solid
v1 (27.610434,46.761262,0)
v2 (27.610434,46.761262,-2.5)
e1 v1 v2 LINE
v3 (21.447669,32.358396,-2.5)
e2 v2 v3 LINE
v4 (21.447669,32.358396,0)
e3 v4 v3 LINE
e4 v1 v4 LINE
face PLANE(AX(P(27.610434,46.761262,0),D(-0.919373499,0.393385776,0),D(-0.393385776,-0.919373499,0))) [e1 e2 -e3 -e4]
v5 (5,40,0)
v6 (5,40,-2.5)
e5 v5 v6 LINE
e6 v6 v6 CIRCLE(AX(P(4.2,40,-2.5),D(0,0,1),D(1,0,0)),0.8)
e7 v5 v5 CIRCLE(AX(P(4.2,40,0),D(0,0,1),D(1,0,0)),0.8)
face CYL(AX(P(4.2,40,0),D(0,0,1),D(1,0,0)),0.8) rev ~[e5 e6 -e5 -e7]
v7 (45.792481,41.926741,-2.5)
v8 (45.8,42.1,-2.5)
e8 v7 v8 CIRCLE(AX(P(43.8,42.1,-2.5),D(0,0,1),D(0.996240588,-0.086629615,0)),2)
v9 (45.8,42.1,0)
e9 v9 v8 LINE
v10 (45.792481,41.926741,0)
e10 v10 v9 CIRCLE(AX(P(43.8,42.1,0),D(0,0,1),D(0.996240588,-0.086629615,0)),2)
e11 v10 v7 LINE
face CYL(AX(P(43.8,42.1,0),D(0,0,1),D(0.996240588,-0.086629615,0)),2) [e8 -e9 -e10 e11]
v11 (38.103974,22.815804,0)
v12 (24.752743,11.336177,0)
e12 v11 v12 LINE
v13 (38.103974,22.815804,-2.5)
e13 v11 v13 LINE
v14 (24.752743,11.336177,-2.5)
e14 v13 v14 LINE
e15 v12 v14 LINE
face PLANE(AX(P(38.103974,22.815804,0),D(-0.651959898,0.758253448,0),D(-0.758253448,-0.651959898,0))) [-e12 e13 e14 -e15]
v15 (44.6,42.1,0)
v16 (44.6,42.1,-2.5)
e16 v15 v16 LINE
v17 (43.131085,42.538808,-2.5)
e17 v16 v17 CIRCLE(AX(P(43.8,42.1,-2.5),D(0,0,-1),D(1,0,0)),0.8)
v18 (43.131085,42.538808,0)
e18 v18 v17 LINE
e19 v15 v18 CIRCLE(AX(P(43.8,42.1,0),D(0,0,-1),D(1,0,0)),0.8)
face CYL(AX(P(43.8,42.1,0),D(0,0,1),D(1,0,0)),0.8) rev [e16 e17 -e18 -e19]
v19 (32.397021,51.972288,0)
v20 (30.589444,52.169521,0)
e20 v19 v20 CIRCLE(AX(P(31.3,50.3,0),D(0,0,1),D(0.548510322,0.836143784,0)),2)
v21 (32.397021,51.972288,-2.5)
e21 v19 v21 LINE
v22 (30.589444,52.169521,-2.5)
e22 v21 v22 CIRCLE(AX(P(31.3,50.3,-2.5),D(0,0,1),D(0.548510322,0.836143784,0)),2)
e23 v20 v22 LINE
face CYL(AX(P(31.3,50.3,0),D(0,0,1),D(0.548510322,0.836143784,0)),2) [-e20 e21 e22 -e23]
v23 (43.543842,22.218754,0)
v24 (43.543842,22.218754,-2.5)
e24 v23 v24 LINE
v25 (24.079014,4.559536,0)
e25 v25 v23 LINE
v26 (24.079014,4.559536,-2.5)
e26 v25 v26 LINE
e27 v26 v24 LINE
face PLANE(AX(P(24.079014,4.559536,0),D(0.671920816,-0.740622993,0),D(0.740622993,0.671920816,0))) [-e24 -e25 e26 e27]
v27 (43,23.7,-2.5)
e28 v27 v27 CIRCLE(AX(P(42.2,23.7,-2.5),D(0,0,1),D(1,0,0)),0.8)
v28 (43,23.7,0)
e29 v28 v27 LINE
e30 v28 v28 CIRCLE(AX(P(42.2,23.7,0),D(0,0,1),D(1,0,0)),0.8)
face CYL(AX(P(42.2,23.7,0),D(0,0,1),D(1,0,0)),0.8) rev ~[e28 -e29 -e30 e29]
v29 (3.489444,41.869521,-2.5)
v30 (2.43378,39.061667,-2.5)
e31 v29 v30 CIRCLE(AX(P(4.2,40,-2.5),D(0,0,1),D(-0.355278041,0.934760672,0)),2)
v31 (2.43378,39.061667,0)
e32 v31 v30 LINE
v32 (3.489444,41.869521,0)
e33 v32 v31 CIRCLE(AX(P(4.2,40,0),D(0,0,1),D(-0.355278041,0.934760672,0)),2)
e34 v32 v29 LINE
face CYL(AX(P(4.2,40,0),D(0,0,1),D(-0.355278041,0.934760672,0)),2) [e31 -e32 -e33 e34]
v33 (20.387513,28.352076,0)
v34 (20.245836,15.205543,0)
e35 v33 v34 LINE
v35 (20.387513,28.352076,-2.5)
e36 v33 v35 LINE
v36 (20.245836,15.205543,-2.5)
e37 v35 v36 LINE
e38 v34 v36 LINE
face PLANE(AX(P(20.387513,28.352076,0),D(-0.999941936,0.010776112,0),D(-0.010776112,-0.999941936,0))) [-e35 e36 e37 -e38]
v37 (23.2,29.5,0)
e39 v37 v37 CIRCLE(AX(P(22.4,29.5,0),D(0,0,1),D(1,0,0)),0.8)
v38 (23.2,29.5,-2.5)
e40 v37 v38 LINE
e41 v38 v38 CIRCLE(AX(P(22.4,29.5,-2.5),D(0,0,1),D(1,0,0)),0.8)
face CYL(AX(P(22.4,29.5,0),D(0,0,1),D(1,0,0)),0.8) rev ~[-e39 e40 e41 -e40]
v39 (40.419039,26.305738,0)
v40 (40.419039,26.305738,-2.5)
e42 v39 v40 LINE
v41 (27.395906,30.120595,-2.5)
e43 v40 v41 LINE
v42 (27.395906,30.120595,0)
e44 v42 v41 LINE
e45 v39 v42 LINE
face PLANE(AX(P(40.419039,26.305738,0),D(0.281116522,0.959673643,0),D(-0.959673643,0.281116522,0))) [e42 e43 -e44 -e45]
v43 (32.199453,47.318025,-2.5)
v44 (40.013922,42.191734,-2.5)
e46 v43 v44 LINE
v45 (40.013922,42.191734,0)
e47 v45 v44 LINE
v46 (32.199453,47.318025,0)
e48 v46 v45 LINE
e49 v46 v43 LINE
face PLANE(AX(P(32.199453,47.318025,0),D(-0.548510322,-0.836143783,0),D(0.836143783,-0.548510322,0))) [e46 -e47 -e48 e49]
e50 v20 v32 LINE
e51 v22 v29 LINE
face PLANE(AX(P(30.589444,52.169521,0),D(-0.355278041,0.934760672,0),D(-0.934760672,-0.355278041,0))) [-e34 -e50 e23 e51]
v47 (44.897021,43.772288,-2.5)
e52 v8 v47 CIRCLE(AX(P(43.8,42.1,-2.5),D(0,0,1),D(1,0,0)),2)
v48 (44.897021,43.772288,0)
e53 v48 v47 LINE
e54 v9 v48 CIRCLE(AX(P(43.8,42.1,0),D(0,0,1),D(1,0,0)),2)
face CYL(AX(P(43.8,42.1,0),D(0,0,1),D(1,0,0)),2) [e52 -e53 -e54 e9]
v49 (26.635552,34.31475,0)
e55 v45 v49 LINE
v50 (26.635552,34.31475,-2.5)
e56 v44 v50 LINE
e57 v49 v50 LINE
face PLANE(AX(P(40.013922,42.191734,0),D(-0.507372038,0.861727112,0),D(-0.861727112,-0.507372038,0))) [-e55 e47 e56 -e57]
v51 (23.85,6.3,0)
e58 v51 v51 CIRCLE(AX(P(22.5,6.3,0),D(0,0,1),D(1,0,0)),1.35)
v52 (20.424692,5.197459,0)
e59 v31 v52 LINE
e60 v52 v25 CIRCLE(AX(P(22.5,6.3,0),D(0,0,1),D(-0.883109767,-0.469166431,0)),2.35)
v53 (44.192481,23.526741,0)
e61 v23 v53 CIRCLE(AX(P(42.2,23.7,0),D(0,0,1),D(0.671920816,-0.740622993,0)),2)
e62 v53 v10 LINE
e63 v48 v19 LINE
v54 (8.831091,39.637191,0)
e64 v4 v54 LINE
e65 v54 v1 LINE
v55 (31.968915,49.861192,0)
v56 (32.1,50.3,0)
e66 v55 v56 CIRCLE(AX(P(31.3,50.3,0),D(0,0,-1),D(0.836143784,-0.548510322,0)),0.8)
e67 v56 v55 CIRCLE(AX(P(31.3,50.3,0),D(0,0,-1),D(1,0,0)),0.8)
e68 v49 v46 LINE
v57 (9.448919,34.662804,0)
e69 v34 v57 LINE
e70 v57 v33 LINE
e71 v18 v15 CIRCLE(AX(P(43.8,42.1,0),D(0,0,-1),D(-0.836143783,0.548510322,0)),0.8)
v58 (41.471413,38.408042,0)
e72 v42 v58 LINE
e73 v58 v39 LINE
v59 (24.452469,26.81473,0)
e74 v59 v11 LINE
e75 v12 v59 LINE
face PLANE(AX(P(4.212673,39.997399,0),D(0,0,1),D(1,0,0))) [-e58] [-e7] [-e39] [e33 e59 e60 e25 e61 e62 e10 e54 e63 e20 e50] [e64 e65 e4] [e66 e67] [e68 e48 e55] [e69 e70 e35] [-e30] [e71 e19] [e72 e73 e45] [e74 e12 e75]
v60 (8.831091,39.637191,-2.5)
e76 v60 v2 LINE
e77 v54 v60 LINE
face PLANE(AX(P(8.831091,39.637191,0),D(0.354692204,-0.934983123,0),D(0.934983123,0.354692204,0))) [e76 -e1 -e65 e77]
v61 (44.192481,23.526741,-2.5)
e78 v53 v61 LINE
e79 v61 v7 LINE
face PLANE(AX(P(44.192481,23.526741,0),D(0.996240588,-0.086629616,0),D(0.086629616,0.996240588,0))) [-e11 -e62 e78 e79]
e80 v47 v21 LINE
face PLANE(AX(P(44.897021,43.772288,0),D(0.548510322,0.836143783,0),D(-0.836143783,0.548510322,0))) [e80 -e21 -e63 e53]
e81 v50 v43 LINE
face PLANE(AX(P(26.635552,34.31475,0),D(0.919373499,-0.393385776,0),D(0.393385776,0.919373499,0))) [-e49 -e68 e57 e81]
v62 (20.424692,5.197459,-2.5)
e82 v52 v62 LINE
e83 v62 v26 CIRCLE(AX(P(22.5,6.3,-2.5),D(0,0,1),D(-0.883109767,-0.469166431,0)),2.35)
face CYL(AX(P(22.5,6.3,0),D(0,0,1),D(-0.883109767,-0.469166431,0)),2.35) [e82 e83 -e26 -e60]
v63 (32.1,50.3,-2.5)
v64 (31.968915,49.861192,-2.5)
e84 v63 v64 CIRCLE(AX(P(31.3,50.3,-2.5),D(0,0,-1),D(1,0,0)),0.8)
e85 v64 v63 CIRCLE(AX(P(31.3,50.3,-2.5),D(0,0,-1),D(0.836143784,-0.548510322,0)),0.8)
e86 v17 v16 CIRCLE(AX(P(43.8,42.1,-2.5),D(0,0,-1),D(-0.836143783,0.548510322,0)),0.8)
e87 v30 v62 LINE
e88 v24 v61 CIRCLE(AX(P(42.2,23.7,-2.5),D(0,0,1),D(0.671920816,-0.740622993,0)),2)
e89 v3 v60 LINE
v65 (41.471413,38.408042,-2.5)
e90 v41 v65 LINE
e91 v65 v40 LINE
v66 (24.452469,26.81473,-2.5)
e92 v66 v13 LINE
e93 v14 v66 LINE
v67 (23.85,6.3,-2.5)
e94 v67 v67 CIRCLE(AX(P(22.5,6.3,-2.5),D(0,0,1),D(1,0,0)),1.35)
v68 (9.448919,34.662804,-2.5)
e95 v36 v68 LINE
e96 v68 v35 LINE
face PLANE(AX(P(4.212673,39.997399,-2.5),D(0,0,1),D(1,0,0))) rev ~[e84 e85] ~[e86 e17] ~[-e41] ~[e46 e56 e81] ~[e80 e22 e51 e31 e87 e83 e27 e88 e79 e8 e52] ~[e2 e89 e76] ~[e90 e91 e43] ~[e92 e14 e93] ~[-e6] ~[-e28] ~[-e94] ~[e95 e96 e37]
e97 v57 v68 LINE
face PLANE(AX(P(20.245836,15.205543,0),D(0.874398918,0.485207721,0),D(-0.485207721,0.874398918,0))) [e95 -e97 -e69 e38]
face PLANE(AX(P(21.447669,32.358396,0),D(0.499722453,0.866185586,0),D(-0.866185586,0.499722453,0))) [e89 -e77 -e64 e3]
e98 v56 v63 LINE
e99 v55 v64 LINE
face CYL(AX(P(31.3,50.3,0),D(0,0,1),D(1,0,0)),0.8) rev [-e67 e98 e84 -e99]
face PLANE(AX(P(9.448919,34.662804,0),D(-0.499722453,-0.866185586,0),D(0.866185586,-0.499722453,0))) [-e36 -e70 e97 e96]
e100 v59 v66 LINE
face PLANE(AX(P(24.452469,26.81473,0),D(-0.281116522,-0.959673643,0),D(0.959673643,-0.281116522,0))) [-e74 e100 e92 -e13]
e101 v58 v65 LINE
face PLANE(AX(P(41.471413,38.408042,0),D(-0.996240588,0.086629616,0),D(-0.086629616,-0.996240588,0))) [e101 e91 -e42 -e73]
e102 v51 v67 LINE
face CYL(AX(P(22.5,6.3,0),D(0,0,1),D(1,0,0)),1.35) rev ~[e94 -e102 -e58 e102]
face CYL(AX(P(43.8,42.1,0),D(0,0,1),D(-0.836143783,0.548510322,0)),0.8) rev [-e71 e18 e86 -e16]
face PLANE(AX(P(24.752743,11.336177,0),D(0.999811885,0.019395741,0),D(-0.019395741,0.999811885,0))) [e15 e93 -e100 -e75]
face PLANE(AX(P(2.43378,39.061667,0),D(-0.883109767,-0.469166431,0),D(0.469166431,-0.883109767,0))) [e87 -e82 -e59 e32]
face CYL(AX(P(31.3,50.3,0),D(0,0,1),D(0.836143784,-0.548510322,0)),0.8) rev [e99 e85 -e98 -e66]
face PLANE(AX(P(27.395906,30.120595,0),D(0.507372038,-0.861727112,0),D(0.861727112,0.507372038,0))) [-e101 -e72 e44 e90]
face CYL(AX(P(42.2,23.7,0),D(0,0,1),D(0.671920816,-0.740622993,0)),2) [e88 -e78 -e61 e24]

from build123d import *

# Parameters (mm, degrees)
F1_R     = 0.8
F1_R_2   = 1.35
F2_DEPTH = 2.5


# Not quite as in the source:
# - a feature of the source that left no trace in its solid (it failed there, or was rolled back) is left out


with BuildPart() as f2:
    # F1 (on Top) → F2 (new body)
    with BuildSketch(Plane.XY):
        with BuildLine():
            ThreePointArc((5.199444907, 41.7323711721), (4.3598959993, 41.9935980712), (3.4894439174, 41.8695213434))
            ThreePointArc((3.4894439174, 41.8695213434), (2.3279381226, 40.7038354404), (2.4337804668, 39.0616671377))
            ThreePointArc((2.4337804668, 39.0616671377), (2.7613029651, 38.610701313), (3.200555093, 38.2676288279))
            ThreePointArc((3.200555093, 38.2676288279), (4.1741960688, 38.0001664676), (5.1544139045, 38.2424181103))
            ThreePointArc((5.1544139045, 38.2424181103), (5.9188408607, 38.9774609565), (6.2, 40))
            ThreePointArc((6.2, 40), (6.1361812507, 40.5012007226), (5.9487978357, 40.9704154419))
            ThreePointArc((5.9487978357, 40.9704154419), (5.625957109, 41.402371678), (5.199444907, 41.7323711721))
        make_face()
        with Locations((4.2, 40)):
            Circle(F1_R, mode=Mode.SUBTRACT)
        with BuildLine():
            Line((27.6104340169, 46.7612620152), (29.4612530015, 51.0867715523))
            ThreePointArc((29.4612530015, 51.0867715523), (29.9151450158, 51.7429749383), (30.5894439174, 52.1695213434))
            Line((30.5894439174, 52.1695213434), (3.4894439174, 41.8695213434))
            ThreePointArc((3.4894439174, 41.8695213434), (4.3598959993, 41.9935980712), (5.199444907, 41.7323711721))
            Line((5.199444907, 41.7323711721), (8.8310911779, 39.6371906312))
            Line((8.8310911779, 39.6371906312), (27.6104340169, 46.7612620152))
        make_face()
        with BuildLine():
            ThreePointArc((32.009384409, 48.4300337542), (32.5519790638, 48.74033708), (32.972287567, 49.202979356))
            ThreePointArc((32.972287567, 49.202979356), (33.0623576694, 49.3544337965), (33.1387469985, 49.5132284477))
            ThreePointArc((33.1387469985, 49.5132284477), (33.2592720583, 49.8984368026), (33.3, 50.3))
            ThreePointArc((33.3, 50.3), (33.0598354025, 51.2502522592), (32.397020644, 51.972287567))
            ThreePointArc((32.397020644, 51.972287567), (31.5169424001, 52.2881991839), (30.5894439174, 52.1695213434))
            ThreePointArc((30.5894439174, 52.1695213434), (29.9151450158, 51.7429749383), (29.4612530015, 51.0867715523))
            ThreePointArc((29.4612530015, 51.0867715523), (29.3852086666, 49.7224412157), (30.202979356, 48.627712433))
            ThreePointArc((30.202979356, 48.627712433), (31.0824346588, 48.311868887), (32.009384409, 48.4300337542))
        make_face()
        with BuildLine():
            ThreePointArc((31.9689150268, 49.8611917424), (30.5334714547, 50.5289846922), (32.1, 50.3))
            ThreePointArc((32.1, 50.3), (32.0665285453, 50.0710153078), (31.9689150268, 49.8611917424))
        make_face(mode=Mode.SUBTRACT)
        with BuildLine():
            ThreePointArc((20.1501364504, 6.325323864), (20.2166788322, 5.7441722888), (20.4246920484, 5.1974588868))
            ThreePointArc((20.4246920484, 5.1974588868), (22.0958795292, 3.985008284), (24.0790139172, 4.5595359673))
            ThreePointArc((24.0790139172, 4.5595359673), (24.6486254566, 5.3482076659), (24.85, 6.3))
            ThreePointArc((24.85, 6.3), (24.8498894798, 6.3227910674), (24.8495579296, 6.3455799911))
            ThreePointArc((24.8495579296, 6.3455799911), (24.7691945263, 6.9109469713), (24.5548374569, 7.4402381443))
            ThreePointArc((24.5548374569, 7.4402381443), (22.9138153936, 8.6132783706), (20.9678942394, 8.0818956025))
            ThreePointArc((20.9678942394, 8.0818956025), (20.3695522772, 7.2918127346), (20.1501364504, 6.325323864))
        make_face()
        with Locations((22.5, 6.3)):
            Circle(F1_R_2, mode=Mode.SUBTRACT)
        with BuildLine():
            ThreePointArc((44.2, 23.7), (43.800697674, 24.8990692042), (42.7622330434, 25.6193472862))
            ThreePointArc((42.7622330434, 25.6193472862), (41.7779870797, 25.6549693336), (40.8960802037, 25.2165068958))
            ThreePointArc((40.8960802037, 25.2165068958), (40.4202125368, 24.6123357857), (40.2075188236, 23.8732592327))
            ThreePointArc((40.2075188236, 23.8732592327), (40.548821119, 22.571457443), (41.6377669566, 21.7806527138))
            ThreePointArc((41.6377669566, 21.7806527138), (42.6480080175, 21.7508235544), (43.5438416317, 22.2187540147))
            ThreePointArc((43.5438416317, 22.2187540147), (43.991778392, 22.8114448842), (44.1924811764, 23.5267407673))
            ThreePointArc((44.1924811764, 23.5267407673), (44.1981194099, 23.6132888496), (44.2, 23.7))
        make_face()
        with Locations((42.2, 23.7)):
            Circle(F1_R, mode=Mode.SUBTRACT)
        with BuildLine():
            ThreePointArc((42.7852559244, 43.8234542237), (42.4204567714, 43.5480540323), (42.127712433, 43.197020644))
            ThreePointArc((42.127712433, 43.197020644), (41.9102999519, 42.7550066627), (41.8075188236, 42.2732592327))
            ThreePointArc((41.8075188236, 42.2732592327), (42.0006206287, 41.2269399345), (42.702979356, 40.427712433))
            ThreePointArc((42.702979356, 40.427712433), (43.7515555461, 40.1005868024), (44.8147440756, 40.3765457763))
            ThreePointArc((44.8147440756, 40.3765457763), (45.4916344335, 41.0330543859), (45.7924811764, 41.9267407673))
            ThreePointArc((45.7924811764, 41.9267407673), (45.7981194099, 42.0132888496), (45.8, 42.1))
            ThreePointArc((45.8, 42.1), (45.5598354025, 43.0502522592), (44.897020644, 43.772287567))
            ThreePointArc((44.897020644, 43.772287567), (43.8484444539, 44.0994131976), (42.7852559244, 43.8234542237))
        make_face()
        with BuildLine():
            ThreePointArc((44.6, 42.1), (43.5710153078, 41.3334714547), (43.1310849732, 42.5388082576))
            ThreePointArc((43.1310849732, 42.5388082576), (44.0289846922, 42.8665285453), (44.6, 42.1))
        make_face(mode=Mode.SUBTRACT)
        with BuildLine():
            ThreePointArc((22.9622330434, 31.4193472862), (22.1534536929, 31.4847455551), (21.3852559244, 31.2234542237))
            ThreePointArc((21.3852559244, 31.2234542237), (20.8983520938, 30.8210047561), (20.5612530015, 30.2867715523))
            ThreePointArc((20.5612530015, 30.2867715523), (20.4429200591, 29.9121141894), (20.400116128, 29.5215522247))
            ThreePointArc((20.400116128, 29.5215522247), (20.6627449521, 28.5090686712), (21.400555093, 27.7676288279))
            ThreePointArc((21.400555093, 27.7676288279), (21.6135843834, 27.6611007428), (21.8377669566, 27.5806527138))
            ThreePointArc((21.8377669566, 27.5806527138), (22.6465463071, 27.5152544449), (23.4147440756, 27.7765457763))
            ThreePointArc((23.4147440756, 27.7765457763), (23.9016479062, 28.1789952439), (24.2387469985, 28.7132284477))
            ThreePointArc((24.2387469985, 28.7132284477), (24.3592720583, 29.0984368026), (24.4, 29.5))
            ThreePointArc((24.4, 29.5), (24.3999059403, 29.5193966531), (24.3996237698, 29.5387914818))
            ThreePointArc((24.3996237698, 29.5387914818), (24.1221080901, 30.5170269053), (23.399444907, 31.2323711721))
            ThreePointArc((23.399444907, 31.2323711721), (23.1864156166, 31.3388992572), (22.9622330434, 31.4193472862))
        make_face()
        with Locations((22.4, 29.5)):
            Circle(F1_R, mode=Mode.SUBTRACT)
        with BuildLine():
            Line((41.6377669566, 21.7806527138), (38.1039741935, 22.8158041293))
            Line((38.1039741935, 22.8158041293), (24.7527433965, 11.336176711))
            Line((24.7527433965, 11.336176711), (24.8495579296, 6.3455799911))
            ThreePointArc((24.8495579296, 6.3455799911), (24.8498894798, 6.3227910674), (24.85, 6.3))
            ThreePointArc((24.85, 6.3), (24.6486254566, 5.3482076659), (24.0790139172, 4.5595359673))
            Line((24.0790139172, 4.5595359673), (43.5438416317, 22.2187540147))
            ThreePointArc((43.5438416317, 22.2187540147), (42.6480080175, 21.7508235544), (41.6377669566, 21.7806527138))
        make_face()
        with BuildLine():
            Line((44.8147440756, 40.3765457763), (41.4714130157, 38.408042442))
            Line((41.4714130157, 38.408042442), (40.4190386777, 26.3057375549))
            Line((40.4190386777, 26.3057375549), (42.7622330434, 25.6193472862))
            ThreePointArc((42.7622330434, 25.6193472862), (43.800697674, 24.8990692042), (44.2, 23.7))
            ThreePointArc((44.2, 23.7), (44.1981194099, 23.6132888496), (44.1924811764, 23.5267407673))
            Line((44.1924811764, 23.5267407673), (45.7924811764, 41.9267407673))
            ThreePointArc((45.7924811764, 41.9267407673), (45.4916344335, 41.0330543859), (44.8147440756, 40.3765457763))
        make_face()
        with BuildLine():
            Line((24.8495579296, 6.3455799911), (24.7527433965, 11.336176711))
            Line((24.7527433965, 11.336176711), (23.1551857529, 9.9625680299))
            Line((23.1551857529, 9.9625680299), (24.5548374569, 7.4402381443))
            ThreePointArc((24.5548374569, 7.4402381443), (24.7691945263, 6.9109469713), (24.8495579296, 6.3455799911))
        make_face()
        with BuildLine():
            Line((24.5548374569, 7.4402381443), (23.1551857529, 9.9625680299))
            Line((23.1551857529, 9.9625680299), (20.9678942394, 8.0818956025))
            ThreePointArc((20.9678942394, 8.0818956025), (22.9138153936, 8.6132783706), (24.5548374569, 7.4402381443))
        make_face()
        with BuildLine():
            Line((40.2075188236, 23.8732592327), (40.2781200828, 24.6851737134))
            Line((40.2781200828, 24.6851737134), (38.1039741935, 22.8158041293))
            Line((38.1039741935, 22.8158041293), (41.6377669566, 21.7806527138))
            ThreePointArc((41.6377669566, 21.7806527138), (40.548821119, 22.571457443), (40.2075188236, 23.8732592327))
        make_face()
        with BuildLine():
            Line((42.7622330434, 25.6193472862), (40.4190386777, 26.3057375549))
            Line((40.4190386777, 26.3057375549), (40.2781200828, 24.6851737134))
            Line((40.2781200828, 24.6851737134), (40.8960802037, 25.2165068958))
            ThreePointArc((40.8960802037, 25.2165068958), (41.7779870797, 25.6549693336), (42.7622330434, 25.6193472862))
        make_face()
        with BuildLine():
            Line((42.702979356, 40.427712433), (41.7040205766, 41.0830293923))
            Line((41.7040205766, 41.0830293923), (41.4714130157, 38.408042442))
            Line((41.4714130157, 38.408042442), (44.8147440756, 40.3765457763))
            ThreePointArc((44.8147440756, 40.3765457763), (43.7515555461, 40.1005868024), (42.702979356, 40.427712433))
        make_face()
        with BuildLine():
            ThreePointArc((42.702979356, 40.427712433), (42.0006206287, 41.2269399345), (41.8075188236, 42.2732592327))
            Line((41.8075188236, 42.2732592327), (41.7040205766, 41.0830293923))
            Line((41.7040205766, 41.0830293923), (42.702979356, 40.427712433))
        make_face()
        with BuildLine():
            Line((40.8960802037, 25.2165068958), (40.2781200828, 24.6851737134))
            Line((40.2781200828, 24.6851737134), (40.2075188236, 23.8732592327))
            ThreePointArc((40.2075188236, 23.8732592327), (40.4202125368, 24.6123357857), (40.8960802037, 25.2165068958))
        make_face()
        with BuildLine():
            ThreePointArc((3.200555093, 38.2676288279), (2.7613029651, 38.610701313), (2.4337804668, 39.0616671377))
            Line((2.4337804668, 39.0616671377), (20.4246920484, 5.1974588868))
            ThreePointArc((20.4246920484, 5.1974588868), (20.2166788322, 5.7441722888), (20.1501364504, 6.325323864))
            Line((20.1501364504, 6.325323864), (20.2458362488, 15.2055432508))
            Line((20.2458362488, 15.2055432508), (9.4489187614, 34.6628036346))
            Line((9.4489187614, 34.6628036346), (3.200555093, 38.2676288279))
        make_face()
        with BuildLine():
            Line((23.1551857529, 9.9625680299), (20.2458362488, 15.2055432508))
            Line((20.2458362488, 15.2055432508), (20.1501364504, 6.325323864))
            ThreePointArc((20.1501364504, 6.325323864), (20.3695522772, 7.2918127346), (20.9678942394, 8.0818956025))
            Line((20.9678942394, 8.0818956025), (23.1551857529, 9.9625680299))
        make_face()
        with BuildLine():
            Line((24.7527433965, 11.336176711), (24.452468903, 26.8147299215))
            Line((24.452468903, 26.8147299215), (21.8377669566, 27.5806527138))
            ThreePointArc((21.8377669566, 27.5806527138), (21.6135843834, 27.6611007428), (21.400555093, 27.7676288279))
            Line((21.400555093, 27.7676288279), (20.3875129911, 28.3520761944))
            Line((20.3875129911, 28.3520761944), (20.2458362488, 15.2055432508))
            Line((20.2458362488, 15.2055432508), (23.1551857529, 9.9625680299))
            Line((23.1551857529, 9.9625680299), (24.7527433965, 11.336176711))
        make_face()
        with BuildLine():
            Line((33.1387469985, 49.5132284477), (32.9986081891, 49.185713028))
            Line((32.9986081891, 49.185713028), (41.9354850239, 43.3231218243))
            Line((41.9354850239, 43.3231218243), (42.7852559244, 43.8234542237))
            ThreePointArc((42.7852559244, 43.8234542237), (43.8484444539, 44.0994131976), (44.897020644, 43.772287567))
            Line((44.897020644, 43.772287567), (32.397020644, 51.972287567))
            ThreePointArc((32.397020644, 51.972287567), (33.0598354025, 51.2502522592), (33.3, 50.3))
            ThreePointArc((33.3, 50.3), (33.2592720583, 49.8984368026), (33.1387469985, 49.5132284477))
        make_face()
        Polygon((41.9354850239, 43.3231218243), (32.9986081891, 49.185713028), (32.1994534098, 47.3180254538), (40.0139218466, 42.1917341592), align=None)
        with BuildLine():
            Line((42.127712433, 43.197020644), (41.9354850239, 43.3231218243))
            Line((41.9354850239, 43.3231218243), (40.0139218466, 42.1917341592))
            Line((40.0139218466, 42.1917341592), (41.7040205766, 41.0830293923))
            Line((41.7040205766, 41.0830293923), (41.8075188236, 42.2732592327))
            ThreePointArc((41.8075188236, 42.2732592327), (41.9102999519, 42.7550066627), (42.127712433, 43.197020644))
        make_face()
        with BuildLine():
            Line((42.7852559244, 43.8234542237), (41.9354850239, 43.3231218243))
            Line((41.9354850239, 43.3231218243), (42.127712433, 43.197020644))
            ThreePointArc((42.127712433, 43.197020644), (42.4204567714, 43.5480540323), (42.7852559244, 43.8234542237))
        make_face()
        with BuildLine():
            Line((32.9986081891, 49.185713028), (32.972287567, 49.202979356))
            ThreePointArc((32.972287567, 49.202979356), (32.5519790638, 48.74033708), (32.009384409, 48.4300337542))
            Line((32.009384409, 48.4300337542), (31.0557778484, 48.068276622))
            Line((31.0557778484, 48.068276622), (32.1994534098, 47.3180254538))
            Line((32.1994534098, 47.3180254538), (32.9986081891, 49.185713028))
        make_face()
        with BuildLine():
            ThreePointArc((33.1387469985, 49.5132284477), (33.0623576694, 49.3544337965), (32.972287567, 49.202979356))
            Line((32.972287567, 49.202979356), (32.9986081891, 49.185713028))
            Line((32.9986081891, 49.185713028), (33.1387469985, 49.5132284477))
        make_face()
        with BuildLine():
            Line((31.0557778484, 48.068276622), (32.009384409, 48.4300337542))
            ThreePointArc((32.009384409, 48.4300337542), (31.0824346588, 48.311868887), (30.202979356, 48.627712433))
            Line((30.202979356, 48.627712433), (31.0557778484, 48.068276622))
        make_face()
        with BuildLine():
            Line((31.0557778484, 48.068276622), (30.202979356, 48.627712433))
            ThreePointArc((30.202979356, 48.627712433), (29.3852086666, 49.7224412157), (29.4612530015, 51.0867715523))
            Line((29.4612530015, 51.0867715523), (27.6104340169, 46.7612620152))
            Line((27.6104340169, 46.7612620152), (31.0557778484, 48.068276622))
        make_face()
        with BuildLine():
            Line((7.0611867859, 38.9657653668), (8.8310911779, 39.6371906312))
            Line((8.8310911779, 39.6371906312), (5.199444907, 41.7323711721))
            ThreePointArc((5.199444907, 41.7323711721), (5.625957109, 41.402371678), (5.9487978357, 40.9704154419))
            Line((5.9487978357, 40.9704154419), (7.0611867859, 38.9657653668))
        make_face()
        with BuildLine():
            Line((5.1544139045, 38.2424181103), (7.0611867859, 38.9657653668))
            Line((7.0611867859, 38.9657653668), (5.9487978357, 40.9704154419))
            ThreePointArc((5.9487978357, 40.9704154419), (6.1361812507, 40.5012007226), (6.2, 40))
            ThreePointArc((6.2, 40), (5.9188408607, 38.9774609565), (5.1544139045, 38.2424181103))
        make_face()
        with BuildLine():
            Line((9.4489187614, 34.6628036346), (7.0611867859, 38.9657653668))
            Line((7.0611867859, 38.9657653668), (5.1544139045, 38.2424181103))
            ThreePointArc((5.1544139045, 38.2424181103), (4.1741960688, 38.0001664676), (3.200555093, 38.2676288279))
            Line((3.200555093, 38.2676288279), (9.4489187614, 34.6628036346))
        make_face()
        with BuildLine():
            Line((20.5612530015, 30.2867715523), (21.4476690943, 32.3583956794))
            Line((21.4476690943, 32.3583956794), (8.8310911779, 39.6371906312))
            Line((8.8310911779, 39.6371906312), (7.0611867859, 38.9657653668))
            Line((7.0611867859, 38.9657653668), (9.4489187614, 34.6628036346))
            Line((9.4489187614, 34.6628036346), (20.3875129911, 28.3520761944))
            Line((20.3875129911, 28.3520761944), (20.400116128, 29.5215522247))
            ThreePointArc((20.400116128, 29.5215522247), (20.4429200591, 29.9121141894), (20.5612530015, 30.2867715523))
        make_face()
        with BuildLine():
            Line((21.3852559244, 31.2234542237), (22.3897518441, 31.8148864007))
            Line((22.3897518441, 31.8148864007), (21.4476690943, 32.3583956794))
            Line((21.4476690943, 32.3583956794), (20.5612530015, 30.2867715523))
            ThreePointArc((20.5612530015, 30.2867715523), (20.8983520938, 30.8210047561), (21.3852559244, 31.2234542237))
        make_face()
        Polygon((26.6355518827, 34.3147499748), (32.1994534098, 47.3180254538), (31.0557778484, 48.068276622), (27.6104340169, 46.7612620152), (21.4476690943, 32.3583956794), (22.3897518441, 31.8148864007), align=None)
        Polygon((25.1255087716, 30.7856604567), (26.6355518827, 34.3147499748), (22.3897518441, 31.8148864007), (23.1920320855, 31.3520324152), align=None)
        Polygon((40.4190386777, 26.3057375549), (27.3959062448, 30.1205945302), (24.4223018654, 28.3697807367), (24.452468903, 26.8147299215), (38.1039741935, 22.8158041293), (40.2781200828, 24.6851737134), align=None)
        Polygon((27.3959062448, 30.1205945302), (25.1255087716, 30.7856604567), (24.4079671049, 29.1087091458), (24.4223018654, 28.3697807367), align=None)
        with BuildLine():
            ThreePointArc((21.400555093, 27.7676288279), (20.6627449521, 28.5090686712), (20.400116128, 29.5215522247))
            Line((20.400116128, 29.5215522247), (20.3875129911, 28.3520761944))
            Line((20.3875129911, 28.3520761944), (21.400555093, 27.7676288279))
        make_face()
        with BuildLine():
            Line((24.452468903, 26.8147299215), (24.4223018654, 28.3697807367))
            Line((24.4223018654, 28.3697807367), (23.4147440756, 27.7765457763))
            ThreePointArc((23.4147440756, 27.7765457763), (22.6465463071, 27.5152544449), (21.8377669566, 27.5806527138))
            Line((21.8377669566, 27.5806527138), (24.452468903, 26.8147299215))
        make_face()
        with BuildLine():
            Line((24.4223018654, 28.3697807367), (24.4079671049, 29.1087091458))
            Line((24.4079671049, 29.1087091458), (24.2387469985, 28.7132284477))
            ThreePointArc((24.2387469985, 28.7132284477), (23.9016479062, 28.1789952439), (23.4147440756, 27.7765457763))
            Line((23.4147440756, 27.7765457763), (24.4223018654, 28.3697807367))
        make_face()
        with BuildLine():
            Line((24.2387469985, 28.7132284477), (24.4079671049, 29.1087091458))
            Line((24.4079671049, 29.1087091458), (24.3996237698, 29.5387914818))
            ThreePointArc((24.3996237698, 29.5387914818), (24.3999059403, 29.5193966531), (24.4, 29.5))
            ThreePointArc((24.4, 29.5), (24.3592720583, 29.0984368026), (24.2387469985, 28.7132284477))
        make_face()
        with BuildLine():
            Line((24.4079671049, 29.1087091458), (25.1255087716, 30.7856604567))
            Line((25.1255087716, 30.7856604567), (23.1920320855, 31.3520324152))
            Line((23.1920320855, 31.3520324152), (23.399444907, 31.2323711721))
            ThreePointArc((23.399444907, 31.2323711721), (24.1221080901, 30.5170269053), (24.3996237698, 29.5387914818))
            Line((24.3996237698, 29.5387914818), (24.4079671049, 29.1087091458))
        make_face()
        with BuildLine():
            Line((23.1920320855, 31.3520324152), (22.3897518441, 31.8148864007))
            Line((22.3897518441, 31.8148864007), (21.3852559244, 31.2234542237))
            ThreePointArc((21.3852559244, 31.2234542237), (22.1534536929, 31.4847455551), (22.9622330434, 31.4193472862))
            Line((22.9622330434, 31.4193472862), (23.1920320855, 31.3520324152))
        make_face()
        with BuildLine():
            Line((23.399444907, 31.2323711721), (23.1920320855, 31.3520324152))
            Line((23.1920320855, 31.3520324152), (22.9622330434, 31.4193472862))
            ThreePointArc((22.9622330434, 31.4193472862), (23.1864156166, 31.3388992572), (23.399444907, 31.2323711721))
        make_face()
        Polygon((41.7040205766, 41.0830293923), (40.0139218466, 42.1917341592), (26.6355518827, 34.3147499748), (25.1255087716, 30.7856604567), (27.3959062448, 30.1205945302), (41.4714130157, 38.408042442), align=None)
    extrude(amount=-F2_DEPTH)


solid = f2.part
